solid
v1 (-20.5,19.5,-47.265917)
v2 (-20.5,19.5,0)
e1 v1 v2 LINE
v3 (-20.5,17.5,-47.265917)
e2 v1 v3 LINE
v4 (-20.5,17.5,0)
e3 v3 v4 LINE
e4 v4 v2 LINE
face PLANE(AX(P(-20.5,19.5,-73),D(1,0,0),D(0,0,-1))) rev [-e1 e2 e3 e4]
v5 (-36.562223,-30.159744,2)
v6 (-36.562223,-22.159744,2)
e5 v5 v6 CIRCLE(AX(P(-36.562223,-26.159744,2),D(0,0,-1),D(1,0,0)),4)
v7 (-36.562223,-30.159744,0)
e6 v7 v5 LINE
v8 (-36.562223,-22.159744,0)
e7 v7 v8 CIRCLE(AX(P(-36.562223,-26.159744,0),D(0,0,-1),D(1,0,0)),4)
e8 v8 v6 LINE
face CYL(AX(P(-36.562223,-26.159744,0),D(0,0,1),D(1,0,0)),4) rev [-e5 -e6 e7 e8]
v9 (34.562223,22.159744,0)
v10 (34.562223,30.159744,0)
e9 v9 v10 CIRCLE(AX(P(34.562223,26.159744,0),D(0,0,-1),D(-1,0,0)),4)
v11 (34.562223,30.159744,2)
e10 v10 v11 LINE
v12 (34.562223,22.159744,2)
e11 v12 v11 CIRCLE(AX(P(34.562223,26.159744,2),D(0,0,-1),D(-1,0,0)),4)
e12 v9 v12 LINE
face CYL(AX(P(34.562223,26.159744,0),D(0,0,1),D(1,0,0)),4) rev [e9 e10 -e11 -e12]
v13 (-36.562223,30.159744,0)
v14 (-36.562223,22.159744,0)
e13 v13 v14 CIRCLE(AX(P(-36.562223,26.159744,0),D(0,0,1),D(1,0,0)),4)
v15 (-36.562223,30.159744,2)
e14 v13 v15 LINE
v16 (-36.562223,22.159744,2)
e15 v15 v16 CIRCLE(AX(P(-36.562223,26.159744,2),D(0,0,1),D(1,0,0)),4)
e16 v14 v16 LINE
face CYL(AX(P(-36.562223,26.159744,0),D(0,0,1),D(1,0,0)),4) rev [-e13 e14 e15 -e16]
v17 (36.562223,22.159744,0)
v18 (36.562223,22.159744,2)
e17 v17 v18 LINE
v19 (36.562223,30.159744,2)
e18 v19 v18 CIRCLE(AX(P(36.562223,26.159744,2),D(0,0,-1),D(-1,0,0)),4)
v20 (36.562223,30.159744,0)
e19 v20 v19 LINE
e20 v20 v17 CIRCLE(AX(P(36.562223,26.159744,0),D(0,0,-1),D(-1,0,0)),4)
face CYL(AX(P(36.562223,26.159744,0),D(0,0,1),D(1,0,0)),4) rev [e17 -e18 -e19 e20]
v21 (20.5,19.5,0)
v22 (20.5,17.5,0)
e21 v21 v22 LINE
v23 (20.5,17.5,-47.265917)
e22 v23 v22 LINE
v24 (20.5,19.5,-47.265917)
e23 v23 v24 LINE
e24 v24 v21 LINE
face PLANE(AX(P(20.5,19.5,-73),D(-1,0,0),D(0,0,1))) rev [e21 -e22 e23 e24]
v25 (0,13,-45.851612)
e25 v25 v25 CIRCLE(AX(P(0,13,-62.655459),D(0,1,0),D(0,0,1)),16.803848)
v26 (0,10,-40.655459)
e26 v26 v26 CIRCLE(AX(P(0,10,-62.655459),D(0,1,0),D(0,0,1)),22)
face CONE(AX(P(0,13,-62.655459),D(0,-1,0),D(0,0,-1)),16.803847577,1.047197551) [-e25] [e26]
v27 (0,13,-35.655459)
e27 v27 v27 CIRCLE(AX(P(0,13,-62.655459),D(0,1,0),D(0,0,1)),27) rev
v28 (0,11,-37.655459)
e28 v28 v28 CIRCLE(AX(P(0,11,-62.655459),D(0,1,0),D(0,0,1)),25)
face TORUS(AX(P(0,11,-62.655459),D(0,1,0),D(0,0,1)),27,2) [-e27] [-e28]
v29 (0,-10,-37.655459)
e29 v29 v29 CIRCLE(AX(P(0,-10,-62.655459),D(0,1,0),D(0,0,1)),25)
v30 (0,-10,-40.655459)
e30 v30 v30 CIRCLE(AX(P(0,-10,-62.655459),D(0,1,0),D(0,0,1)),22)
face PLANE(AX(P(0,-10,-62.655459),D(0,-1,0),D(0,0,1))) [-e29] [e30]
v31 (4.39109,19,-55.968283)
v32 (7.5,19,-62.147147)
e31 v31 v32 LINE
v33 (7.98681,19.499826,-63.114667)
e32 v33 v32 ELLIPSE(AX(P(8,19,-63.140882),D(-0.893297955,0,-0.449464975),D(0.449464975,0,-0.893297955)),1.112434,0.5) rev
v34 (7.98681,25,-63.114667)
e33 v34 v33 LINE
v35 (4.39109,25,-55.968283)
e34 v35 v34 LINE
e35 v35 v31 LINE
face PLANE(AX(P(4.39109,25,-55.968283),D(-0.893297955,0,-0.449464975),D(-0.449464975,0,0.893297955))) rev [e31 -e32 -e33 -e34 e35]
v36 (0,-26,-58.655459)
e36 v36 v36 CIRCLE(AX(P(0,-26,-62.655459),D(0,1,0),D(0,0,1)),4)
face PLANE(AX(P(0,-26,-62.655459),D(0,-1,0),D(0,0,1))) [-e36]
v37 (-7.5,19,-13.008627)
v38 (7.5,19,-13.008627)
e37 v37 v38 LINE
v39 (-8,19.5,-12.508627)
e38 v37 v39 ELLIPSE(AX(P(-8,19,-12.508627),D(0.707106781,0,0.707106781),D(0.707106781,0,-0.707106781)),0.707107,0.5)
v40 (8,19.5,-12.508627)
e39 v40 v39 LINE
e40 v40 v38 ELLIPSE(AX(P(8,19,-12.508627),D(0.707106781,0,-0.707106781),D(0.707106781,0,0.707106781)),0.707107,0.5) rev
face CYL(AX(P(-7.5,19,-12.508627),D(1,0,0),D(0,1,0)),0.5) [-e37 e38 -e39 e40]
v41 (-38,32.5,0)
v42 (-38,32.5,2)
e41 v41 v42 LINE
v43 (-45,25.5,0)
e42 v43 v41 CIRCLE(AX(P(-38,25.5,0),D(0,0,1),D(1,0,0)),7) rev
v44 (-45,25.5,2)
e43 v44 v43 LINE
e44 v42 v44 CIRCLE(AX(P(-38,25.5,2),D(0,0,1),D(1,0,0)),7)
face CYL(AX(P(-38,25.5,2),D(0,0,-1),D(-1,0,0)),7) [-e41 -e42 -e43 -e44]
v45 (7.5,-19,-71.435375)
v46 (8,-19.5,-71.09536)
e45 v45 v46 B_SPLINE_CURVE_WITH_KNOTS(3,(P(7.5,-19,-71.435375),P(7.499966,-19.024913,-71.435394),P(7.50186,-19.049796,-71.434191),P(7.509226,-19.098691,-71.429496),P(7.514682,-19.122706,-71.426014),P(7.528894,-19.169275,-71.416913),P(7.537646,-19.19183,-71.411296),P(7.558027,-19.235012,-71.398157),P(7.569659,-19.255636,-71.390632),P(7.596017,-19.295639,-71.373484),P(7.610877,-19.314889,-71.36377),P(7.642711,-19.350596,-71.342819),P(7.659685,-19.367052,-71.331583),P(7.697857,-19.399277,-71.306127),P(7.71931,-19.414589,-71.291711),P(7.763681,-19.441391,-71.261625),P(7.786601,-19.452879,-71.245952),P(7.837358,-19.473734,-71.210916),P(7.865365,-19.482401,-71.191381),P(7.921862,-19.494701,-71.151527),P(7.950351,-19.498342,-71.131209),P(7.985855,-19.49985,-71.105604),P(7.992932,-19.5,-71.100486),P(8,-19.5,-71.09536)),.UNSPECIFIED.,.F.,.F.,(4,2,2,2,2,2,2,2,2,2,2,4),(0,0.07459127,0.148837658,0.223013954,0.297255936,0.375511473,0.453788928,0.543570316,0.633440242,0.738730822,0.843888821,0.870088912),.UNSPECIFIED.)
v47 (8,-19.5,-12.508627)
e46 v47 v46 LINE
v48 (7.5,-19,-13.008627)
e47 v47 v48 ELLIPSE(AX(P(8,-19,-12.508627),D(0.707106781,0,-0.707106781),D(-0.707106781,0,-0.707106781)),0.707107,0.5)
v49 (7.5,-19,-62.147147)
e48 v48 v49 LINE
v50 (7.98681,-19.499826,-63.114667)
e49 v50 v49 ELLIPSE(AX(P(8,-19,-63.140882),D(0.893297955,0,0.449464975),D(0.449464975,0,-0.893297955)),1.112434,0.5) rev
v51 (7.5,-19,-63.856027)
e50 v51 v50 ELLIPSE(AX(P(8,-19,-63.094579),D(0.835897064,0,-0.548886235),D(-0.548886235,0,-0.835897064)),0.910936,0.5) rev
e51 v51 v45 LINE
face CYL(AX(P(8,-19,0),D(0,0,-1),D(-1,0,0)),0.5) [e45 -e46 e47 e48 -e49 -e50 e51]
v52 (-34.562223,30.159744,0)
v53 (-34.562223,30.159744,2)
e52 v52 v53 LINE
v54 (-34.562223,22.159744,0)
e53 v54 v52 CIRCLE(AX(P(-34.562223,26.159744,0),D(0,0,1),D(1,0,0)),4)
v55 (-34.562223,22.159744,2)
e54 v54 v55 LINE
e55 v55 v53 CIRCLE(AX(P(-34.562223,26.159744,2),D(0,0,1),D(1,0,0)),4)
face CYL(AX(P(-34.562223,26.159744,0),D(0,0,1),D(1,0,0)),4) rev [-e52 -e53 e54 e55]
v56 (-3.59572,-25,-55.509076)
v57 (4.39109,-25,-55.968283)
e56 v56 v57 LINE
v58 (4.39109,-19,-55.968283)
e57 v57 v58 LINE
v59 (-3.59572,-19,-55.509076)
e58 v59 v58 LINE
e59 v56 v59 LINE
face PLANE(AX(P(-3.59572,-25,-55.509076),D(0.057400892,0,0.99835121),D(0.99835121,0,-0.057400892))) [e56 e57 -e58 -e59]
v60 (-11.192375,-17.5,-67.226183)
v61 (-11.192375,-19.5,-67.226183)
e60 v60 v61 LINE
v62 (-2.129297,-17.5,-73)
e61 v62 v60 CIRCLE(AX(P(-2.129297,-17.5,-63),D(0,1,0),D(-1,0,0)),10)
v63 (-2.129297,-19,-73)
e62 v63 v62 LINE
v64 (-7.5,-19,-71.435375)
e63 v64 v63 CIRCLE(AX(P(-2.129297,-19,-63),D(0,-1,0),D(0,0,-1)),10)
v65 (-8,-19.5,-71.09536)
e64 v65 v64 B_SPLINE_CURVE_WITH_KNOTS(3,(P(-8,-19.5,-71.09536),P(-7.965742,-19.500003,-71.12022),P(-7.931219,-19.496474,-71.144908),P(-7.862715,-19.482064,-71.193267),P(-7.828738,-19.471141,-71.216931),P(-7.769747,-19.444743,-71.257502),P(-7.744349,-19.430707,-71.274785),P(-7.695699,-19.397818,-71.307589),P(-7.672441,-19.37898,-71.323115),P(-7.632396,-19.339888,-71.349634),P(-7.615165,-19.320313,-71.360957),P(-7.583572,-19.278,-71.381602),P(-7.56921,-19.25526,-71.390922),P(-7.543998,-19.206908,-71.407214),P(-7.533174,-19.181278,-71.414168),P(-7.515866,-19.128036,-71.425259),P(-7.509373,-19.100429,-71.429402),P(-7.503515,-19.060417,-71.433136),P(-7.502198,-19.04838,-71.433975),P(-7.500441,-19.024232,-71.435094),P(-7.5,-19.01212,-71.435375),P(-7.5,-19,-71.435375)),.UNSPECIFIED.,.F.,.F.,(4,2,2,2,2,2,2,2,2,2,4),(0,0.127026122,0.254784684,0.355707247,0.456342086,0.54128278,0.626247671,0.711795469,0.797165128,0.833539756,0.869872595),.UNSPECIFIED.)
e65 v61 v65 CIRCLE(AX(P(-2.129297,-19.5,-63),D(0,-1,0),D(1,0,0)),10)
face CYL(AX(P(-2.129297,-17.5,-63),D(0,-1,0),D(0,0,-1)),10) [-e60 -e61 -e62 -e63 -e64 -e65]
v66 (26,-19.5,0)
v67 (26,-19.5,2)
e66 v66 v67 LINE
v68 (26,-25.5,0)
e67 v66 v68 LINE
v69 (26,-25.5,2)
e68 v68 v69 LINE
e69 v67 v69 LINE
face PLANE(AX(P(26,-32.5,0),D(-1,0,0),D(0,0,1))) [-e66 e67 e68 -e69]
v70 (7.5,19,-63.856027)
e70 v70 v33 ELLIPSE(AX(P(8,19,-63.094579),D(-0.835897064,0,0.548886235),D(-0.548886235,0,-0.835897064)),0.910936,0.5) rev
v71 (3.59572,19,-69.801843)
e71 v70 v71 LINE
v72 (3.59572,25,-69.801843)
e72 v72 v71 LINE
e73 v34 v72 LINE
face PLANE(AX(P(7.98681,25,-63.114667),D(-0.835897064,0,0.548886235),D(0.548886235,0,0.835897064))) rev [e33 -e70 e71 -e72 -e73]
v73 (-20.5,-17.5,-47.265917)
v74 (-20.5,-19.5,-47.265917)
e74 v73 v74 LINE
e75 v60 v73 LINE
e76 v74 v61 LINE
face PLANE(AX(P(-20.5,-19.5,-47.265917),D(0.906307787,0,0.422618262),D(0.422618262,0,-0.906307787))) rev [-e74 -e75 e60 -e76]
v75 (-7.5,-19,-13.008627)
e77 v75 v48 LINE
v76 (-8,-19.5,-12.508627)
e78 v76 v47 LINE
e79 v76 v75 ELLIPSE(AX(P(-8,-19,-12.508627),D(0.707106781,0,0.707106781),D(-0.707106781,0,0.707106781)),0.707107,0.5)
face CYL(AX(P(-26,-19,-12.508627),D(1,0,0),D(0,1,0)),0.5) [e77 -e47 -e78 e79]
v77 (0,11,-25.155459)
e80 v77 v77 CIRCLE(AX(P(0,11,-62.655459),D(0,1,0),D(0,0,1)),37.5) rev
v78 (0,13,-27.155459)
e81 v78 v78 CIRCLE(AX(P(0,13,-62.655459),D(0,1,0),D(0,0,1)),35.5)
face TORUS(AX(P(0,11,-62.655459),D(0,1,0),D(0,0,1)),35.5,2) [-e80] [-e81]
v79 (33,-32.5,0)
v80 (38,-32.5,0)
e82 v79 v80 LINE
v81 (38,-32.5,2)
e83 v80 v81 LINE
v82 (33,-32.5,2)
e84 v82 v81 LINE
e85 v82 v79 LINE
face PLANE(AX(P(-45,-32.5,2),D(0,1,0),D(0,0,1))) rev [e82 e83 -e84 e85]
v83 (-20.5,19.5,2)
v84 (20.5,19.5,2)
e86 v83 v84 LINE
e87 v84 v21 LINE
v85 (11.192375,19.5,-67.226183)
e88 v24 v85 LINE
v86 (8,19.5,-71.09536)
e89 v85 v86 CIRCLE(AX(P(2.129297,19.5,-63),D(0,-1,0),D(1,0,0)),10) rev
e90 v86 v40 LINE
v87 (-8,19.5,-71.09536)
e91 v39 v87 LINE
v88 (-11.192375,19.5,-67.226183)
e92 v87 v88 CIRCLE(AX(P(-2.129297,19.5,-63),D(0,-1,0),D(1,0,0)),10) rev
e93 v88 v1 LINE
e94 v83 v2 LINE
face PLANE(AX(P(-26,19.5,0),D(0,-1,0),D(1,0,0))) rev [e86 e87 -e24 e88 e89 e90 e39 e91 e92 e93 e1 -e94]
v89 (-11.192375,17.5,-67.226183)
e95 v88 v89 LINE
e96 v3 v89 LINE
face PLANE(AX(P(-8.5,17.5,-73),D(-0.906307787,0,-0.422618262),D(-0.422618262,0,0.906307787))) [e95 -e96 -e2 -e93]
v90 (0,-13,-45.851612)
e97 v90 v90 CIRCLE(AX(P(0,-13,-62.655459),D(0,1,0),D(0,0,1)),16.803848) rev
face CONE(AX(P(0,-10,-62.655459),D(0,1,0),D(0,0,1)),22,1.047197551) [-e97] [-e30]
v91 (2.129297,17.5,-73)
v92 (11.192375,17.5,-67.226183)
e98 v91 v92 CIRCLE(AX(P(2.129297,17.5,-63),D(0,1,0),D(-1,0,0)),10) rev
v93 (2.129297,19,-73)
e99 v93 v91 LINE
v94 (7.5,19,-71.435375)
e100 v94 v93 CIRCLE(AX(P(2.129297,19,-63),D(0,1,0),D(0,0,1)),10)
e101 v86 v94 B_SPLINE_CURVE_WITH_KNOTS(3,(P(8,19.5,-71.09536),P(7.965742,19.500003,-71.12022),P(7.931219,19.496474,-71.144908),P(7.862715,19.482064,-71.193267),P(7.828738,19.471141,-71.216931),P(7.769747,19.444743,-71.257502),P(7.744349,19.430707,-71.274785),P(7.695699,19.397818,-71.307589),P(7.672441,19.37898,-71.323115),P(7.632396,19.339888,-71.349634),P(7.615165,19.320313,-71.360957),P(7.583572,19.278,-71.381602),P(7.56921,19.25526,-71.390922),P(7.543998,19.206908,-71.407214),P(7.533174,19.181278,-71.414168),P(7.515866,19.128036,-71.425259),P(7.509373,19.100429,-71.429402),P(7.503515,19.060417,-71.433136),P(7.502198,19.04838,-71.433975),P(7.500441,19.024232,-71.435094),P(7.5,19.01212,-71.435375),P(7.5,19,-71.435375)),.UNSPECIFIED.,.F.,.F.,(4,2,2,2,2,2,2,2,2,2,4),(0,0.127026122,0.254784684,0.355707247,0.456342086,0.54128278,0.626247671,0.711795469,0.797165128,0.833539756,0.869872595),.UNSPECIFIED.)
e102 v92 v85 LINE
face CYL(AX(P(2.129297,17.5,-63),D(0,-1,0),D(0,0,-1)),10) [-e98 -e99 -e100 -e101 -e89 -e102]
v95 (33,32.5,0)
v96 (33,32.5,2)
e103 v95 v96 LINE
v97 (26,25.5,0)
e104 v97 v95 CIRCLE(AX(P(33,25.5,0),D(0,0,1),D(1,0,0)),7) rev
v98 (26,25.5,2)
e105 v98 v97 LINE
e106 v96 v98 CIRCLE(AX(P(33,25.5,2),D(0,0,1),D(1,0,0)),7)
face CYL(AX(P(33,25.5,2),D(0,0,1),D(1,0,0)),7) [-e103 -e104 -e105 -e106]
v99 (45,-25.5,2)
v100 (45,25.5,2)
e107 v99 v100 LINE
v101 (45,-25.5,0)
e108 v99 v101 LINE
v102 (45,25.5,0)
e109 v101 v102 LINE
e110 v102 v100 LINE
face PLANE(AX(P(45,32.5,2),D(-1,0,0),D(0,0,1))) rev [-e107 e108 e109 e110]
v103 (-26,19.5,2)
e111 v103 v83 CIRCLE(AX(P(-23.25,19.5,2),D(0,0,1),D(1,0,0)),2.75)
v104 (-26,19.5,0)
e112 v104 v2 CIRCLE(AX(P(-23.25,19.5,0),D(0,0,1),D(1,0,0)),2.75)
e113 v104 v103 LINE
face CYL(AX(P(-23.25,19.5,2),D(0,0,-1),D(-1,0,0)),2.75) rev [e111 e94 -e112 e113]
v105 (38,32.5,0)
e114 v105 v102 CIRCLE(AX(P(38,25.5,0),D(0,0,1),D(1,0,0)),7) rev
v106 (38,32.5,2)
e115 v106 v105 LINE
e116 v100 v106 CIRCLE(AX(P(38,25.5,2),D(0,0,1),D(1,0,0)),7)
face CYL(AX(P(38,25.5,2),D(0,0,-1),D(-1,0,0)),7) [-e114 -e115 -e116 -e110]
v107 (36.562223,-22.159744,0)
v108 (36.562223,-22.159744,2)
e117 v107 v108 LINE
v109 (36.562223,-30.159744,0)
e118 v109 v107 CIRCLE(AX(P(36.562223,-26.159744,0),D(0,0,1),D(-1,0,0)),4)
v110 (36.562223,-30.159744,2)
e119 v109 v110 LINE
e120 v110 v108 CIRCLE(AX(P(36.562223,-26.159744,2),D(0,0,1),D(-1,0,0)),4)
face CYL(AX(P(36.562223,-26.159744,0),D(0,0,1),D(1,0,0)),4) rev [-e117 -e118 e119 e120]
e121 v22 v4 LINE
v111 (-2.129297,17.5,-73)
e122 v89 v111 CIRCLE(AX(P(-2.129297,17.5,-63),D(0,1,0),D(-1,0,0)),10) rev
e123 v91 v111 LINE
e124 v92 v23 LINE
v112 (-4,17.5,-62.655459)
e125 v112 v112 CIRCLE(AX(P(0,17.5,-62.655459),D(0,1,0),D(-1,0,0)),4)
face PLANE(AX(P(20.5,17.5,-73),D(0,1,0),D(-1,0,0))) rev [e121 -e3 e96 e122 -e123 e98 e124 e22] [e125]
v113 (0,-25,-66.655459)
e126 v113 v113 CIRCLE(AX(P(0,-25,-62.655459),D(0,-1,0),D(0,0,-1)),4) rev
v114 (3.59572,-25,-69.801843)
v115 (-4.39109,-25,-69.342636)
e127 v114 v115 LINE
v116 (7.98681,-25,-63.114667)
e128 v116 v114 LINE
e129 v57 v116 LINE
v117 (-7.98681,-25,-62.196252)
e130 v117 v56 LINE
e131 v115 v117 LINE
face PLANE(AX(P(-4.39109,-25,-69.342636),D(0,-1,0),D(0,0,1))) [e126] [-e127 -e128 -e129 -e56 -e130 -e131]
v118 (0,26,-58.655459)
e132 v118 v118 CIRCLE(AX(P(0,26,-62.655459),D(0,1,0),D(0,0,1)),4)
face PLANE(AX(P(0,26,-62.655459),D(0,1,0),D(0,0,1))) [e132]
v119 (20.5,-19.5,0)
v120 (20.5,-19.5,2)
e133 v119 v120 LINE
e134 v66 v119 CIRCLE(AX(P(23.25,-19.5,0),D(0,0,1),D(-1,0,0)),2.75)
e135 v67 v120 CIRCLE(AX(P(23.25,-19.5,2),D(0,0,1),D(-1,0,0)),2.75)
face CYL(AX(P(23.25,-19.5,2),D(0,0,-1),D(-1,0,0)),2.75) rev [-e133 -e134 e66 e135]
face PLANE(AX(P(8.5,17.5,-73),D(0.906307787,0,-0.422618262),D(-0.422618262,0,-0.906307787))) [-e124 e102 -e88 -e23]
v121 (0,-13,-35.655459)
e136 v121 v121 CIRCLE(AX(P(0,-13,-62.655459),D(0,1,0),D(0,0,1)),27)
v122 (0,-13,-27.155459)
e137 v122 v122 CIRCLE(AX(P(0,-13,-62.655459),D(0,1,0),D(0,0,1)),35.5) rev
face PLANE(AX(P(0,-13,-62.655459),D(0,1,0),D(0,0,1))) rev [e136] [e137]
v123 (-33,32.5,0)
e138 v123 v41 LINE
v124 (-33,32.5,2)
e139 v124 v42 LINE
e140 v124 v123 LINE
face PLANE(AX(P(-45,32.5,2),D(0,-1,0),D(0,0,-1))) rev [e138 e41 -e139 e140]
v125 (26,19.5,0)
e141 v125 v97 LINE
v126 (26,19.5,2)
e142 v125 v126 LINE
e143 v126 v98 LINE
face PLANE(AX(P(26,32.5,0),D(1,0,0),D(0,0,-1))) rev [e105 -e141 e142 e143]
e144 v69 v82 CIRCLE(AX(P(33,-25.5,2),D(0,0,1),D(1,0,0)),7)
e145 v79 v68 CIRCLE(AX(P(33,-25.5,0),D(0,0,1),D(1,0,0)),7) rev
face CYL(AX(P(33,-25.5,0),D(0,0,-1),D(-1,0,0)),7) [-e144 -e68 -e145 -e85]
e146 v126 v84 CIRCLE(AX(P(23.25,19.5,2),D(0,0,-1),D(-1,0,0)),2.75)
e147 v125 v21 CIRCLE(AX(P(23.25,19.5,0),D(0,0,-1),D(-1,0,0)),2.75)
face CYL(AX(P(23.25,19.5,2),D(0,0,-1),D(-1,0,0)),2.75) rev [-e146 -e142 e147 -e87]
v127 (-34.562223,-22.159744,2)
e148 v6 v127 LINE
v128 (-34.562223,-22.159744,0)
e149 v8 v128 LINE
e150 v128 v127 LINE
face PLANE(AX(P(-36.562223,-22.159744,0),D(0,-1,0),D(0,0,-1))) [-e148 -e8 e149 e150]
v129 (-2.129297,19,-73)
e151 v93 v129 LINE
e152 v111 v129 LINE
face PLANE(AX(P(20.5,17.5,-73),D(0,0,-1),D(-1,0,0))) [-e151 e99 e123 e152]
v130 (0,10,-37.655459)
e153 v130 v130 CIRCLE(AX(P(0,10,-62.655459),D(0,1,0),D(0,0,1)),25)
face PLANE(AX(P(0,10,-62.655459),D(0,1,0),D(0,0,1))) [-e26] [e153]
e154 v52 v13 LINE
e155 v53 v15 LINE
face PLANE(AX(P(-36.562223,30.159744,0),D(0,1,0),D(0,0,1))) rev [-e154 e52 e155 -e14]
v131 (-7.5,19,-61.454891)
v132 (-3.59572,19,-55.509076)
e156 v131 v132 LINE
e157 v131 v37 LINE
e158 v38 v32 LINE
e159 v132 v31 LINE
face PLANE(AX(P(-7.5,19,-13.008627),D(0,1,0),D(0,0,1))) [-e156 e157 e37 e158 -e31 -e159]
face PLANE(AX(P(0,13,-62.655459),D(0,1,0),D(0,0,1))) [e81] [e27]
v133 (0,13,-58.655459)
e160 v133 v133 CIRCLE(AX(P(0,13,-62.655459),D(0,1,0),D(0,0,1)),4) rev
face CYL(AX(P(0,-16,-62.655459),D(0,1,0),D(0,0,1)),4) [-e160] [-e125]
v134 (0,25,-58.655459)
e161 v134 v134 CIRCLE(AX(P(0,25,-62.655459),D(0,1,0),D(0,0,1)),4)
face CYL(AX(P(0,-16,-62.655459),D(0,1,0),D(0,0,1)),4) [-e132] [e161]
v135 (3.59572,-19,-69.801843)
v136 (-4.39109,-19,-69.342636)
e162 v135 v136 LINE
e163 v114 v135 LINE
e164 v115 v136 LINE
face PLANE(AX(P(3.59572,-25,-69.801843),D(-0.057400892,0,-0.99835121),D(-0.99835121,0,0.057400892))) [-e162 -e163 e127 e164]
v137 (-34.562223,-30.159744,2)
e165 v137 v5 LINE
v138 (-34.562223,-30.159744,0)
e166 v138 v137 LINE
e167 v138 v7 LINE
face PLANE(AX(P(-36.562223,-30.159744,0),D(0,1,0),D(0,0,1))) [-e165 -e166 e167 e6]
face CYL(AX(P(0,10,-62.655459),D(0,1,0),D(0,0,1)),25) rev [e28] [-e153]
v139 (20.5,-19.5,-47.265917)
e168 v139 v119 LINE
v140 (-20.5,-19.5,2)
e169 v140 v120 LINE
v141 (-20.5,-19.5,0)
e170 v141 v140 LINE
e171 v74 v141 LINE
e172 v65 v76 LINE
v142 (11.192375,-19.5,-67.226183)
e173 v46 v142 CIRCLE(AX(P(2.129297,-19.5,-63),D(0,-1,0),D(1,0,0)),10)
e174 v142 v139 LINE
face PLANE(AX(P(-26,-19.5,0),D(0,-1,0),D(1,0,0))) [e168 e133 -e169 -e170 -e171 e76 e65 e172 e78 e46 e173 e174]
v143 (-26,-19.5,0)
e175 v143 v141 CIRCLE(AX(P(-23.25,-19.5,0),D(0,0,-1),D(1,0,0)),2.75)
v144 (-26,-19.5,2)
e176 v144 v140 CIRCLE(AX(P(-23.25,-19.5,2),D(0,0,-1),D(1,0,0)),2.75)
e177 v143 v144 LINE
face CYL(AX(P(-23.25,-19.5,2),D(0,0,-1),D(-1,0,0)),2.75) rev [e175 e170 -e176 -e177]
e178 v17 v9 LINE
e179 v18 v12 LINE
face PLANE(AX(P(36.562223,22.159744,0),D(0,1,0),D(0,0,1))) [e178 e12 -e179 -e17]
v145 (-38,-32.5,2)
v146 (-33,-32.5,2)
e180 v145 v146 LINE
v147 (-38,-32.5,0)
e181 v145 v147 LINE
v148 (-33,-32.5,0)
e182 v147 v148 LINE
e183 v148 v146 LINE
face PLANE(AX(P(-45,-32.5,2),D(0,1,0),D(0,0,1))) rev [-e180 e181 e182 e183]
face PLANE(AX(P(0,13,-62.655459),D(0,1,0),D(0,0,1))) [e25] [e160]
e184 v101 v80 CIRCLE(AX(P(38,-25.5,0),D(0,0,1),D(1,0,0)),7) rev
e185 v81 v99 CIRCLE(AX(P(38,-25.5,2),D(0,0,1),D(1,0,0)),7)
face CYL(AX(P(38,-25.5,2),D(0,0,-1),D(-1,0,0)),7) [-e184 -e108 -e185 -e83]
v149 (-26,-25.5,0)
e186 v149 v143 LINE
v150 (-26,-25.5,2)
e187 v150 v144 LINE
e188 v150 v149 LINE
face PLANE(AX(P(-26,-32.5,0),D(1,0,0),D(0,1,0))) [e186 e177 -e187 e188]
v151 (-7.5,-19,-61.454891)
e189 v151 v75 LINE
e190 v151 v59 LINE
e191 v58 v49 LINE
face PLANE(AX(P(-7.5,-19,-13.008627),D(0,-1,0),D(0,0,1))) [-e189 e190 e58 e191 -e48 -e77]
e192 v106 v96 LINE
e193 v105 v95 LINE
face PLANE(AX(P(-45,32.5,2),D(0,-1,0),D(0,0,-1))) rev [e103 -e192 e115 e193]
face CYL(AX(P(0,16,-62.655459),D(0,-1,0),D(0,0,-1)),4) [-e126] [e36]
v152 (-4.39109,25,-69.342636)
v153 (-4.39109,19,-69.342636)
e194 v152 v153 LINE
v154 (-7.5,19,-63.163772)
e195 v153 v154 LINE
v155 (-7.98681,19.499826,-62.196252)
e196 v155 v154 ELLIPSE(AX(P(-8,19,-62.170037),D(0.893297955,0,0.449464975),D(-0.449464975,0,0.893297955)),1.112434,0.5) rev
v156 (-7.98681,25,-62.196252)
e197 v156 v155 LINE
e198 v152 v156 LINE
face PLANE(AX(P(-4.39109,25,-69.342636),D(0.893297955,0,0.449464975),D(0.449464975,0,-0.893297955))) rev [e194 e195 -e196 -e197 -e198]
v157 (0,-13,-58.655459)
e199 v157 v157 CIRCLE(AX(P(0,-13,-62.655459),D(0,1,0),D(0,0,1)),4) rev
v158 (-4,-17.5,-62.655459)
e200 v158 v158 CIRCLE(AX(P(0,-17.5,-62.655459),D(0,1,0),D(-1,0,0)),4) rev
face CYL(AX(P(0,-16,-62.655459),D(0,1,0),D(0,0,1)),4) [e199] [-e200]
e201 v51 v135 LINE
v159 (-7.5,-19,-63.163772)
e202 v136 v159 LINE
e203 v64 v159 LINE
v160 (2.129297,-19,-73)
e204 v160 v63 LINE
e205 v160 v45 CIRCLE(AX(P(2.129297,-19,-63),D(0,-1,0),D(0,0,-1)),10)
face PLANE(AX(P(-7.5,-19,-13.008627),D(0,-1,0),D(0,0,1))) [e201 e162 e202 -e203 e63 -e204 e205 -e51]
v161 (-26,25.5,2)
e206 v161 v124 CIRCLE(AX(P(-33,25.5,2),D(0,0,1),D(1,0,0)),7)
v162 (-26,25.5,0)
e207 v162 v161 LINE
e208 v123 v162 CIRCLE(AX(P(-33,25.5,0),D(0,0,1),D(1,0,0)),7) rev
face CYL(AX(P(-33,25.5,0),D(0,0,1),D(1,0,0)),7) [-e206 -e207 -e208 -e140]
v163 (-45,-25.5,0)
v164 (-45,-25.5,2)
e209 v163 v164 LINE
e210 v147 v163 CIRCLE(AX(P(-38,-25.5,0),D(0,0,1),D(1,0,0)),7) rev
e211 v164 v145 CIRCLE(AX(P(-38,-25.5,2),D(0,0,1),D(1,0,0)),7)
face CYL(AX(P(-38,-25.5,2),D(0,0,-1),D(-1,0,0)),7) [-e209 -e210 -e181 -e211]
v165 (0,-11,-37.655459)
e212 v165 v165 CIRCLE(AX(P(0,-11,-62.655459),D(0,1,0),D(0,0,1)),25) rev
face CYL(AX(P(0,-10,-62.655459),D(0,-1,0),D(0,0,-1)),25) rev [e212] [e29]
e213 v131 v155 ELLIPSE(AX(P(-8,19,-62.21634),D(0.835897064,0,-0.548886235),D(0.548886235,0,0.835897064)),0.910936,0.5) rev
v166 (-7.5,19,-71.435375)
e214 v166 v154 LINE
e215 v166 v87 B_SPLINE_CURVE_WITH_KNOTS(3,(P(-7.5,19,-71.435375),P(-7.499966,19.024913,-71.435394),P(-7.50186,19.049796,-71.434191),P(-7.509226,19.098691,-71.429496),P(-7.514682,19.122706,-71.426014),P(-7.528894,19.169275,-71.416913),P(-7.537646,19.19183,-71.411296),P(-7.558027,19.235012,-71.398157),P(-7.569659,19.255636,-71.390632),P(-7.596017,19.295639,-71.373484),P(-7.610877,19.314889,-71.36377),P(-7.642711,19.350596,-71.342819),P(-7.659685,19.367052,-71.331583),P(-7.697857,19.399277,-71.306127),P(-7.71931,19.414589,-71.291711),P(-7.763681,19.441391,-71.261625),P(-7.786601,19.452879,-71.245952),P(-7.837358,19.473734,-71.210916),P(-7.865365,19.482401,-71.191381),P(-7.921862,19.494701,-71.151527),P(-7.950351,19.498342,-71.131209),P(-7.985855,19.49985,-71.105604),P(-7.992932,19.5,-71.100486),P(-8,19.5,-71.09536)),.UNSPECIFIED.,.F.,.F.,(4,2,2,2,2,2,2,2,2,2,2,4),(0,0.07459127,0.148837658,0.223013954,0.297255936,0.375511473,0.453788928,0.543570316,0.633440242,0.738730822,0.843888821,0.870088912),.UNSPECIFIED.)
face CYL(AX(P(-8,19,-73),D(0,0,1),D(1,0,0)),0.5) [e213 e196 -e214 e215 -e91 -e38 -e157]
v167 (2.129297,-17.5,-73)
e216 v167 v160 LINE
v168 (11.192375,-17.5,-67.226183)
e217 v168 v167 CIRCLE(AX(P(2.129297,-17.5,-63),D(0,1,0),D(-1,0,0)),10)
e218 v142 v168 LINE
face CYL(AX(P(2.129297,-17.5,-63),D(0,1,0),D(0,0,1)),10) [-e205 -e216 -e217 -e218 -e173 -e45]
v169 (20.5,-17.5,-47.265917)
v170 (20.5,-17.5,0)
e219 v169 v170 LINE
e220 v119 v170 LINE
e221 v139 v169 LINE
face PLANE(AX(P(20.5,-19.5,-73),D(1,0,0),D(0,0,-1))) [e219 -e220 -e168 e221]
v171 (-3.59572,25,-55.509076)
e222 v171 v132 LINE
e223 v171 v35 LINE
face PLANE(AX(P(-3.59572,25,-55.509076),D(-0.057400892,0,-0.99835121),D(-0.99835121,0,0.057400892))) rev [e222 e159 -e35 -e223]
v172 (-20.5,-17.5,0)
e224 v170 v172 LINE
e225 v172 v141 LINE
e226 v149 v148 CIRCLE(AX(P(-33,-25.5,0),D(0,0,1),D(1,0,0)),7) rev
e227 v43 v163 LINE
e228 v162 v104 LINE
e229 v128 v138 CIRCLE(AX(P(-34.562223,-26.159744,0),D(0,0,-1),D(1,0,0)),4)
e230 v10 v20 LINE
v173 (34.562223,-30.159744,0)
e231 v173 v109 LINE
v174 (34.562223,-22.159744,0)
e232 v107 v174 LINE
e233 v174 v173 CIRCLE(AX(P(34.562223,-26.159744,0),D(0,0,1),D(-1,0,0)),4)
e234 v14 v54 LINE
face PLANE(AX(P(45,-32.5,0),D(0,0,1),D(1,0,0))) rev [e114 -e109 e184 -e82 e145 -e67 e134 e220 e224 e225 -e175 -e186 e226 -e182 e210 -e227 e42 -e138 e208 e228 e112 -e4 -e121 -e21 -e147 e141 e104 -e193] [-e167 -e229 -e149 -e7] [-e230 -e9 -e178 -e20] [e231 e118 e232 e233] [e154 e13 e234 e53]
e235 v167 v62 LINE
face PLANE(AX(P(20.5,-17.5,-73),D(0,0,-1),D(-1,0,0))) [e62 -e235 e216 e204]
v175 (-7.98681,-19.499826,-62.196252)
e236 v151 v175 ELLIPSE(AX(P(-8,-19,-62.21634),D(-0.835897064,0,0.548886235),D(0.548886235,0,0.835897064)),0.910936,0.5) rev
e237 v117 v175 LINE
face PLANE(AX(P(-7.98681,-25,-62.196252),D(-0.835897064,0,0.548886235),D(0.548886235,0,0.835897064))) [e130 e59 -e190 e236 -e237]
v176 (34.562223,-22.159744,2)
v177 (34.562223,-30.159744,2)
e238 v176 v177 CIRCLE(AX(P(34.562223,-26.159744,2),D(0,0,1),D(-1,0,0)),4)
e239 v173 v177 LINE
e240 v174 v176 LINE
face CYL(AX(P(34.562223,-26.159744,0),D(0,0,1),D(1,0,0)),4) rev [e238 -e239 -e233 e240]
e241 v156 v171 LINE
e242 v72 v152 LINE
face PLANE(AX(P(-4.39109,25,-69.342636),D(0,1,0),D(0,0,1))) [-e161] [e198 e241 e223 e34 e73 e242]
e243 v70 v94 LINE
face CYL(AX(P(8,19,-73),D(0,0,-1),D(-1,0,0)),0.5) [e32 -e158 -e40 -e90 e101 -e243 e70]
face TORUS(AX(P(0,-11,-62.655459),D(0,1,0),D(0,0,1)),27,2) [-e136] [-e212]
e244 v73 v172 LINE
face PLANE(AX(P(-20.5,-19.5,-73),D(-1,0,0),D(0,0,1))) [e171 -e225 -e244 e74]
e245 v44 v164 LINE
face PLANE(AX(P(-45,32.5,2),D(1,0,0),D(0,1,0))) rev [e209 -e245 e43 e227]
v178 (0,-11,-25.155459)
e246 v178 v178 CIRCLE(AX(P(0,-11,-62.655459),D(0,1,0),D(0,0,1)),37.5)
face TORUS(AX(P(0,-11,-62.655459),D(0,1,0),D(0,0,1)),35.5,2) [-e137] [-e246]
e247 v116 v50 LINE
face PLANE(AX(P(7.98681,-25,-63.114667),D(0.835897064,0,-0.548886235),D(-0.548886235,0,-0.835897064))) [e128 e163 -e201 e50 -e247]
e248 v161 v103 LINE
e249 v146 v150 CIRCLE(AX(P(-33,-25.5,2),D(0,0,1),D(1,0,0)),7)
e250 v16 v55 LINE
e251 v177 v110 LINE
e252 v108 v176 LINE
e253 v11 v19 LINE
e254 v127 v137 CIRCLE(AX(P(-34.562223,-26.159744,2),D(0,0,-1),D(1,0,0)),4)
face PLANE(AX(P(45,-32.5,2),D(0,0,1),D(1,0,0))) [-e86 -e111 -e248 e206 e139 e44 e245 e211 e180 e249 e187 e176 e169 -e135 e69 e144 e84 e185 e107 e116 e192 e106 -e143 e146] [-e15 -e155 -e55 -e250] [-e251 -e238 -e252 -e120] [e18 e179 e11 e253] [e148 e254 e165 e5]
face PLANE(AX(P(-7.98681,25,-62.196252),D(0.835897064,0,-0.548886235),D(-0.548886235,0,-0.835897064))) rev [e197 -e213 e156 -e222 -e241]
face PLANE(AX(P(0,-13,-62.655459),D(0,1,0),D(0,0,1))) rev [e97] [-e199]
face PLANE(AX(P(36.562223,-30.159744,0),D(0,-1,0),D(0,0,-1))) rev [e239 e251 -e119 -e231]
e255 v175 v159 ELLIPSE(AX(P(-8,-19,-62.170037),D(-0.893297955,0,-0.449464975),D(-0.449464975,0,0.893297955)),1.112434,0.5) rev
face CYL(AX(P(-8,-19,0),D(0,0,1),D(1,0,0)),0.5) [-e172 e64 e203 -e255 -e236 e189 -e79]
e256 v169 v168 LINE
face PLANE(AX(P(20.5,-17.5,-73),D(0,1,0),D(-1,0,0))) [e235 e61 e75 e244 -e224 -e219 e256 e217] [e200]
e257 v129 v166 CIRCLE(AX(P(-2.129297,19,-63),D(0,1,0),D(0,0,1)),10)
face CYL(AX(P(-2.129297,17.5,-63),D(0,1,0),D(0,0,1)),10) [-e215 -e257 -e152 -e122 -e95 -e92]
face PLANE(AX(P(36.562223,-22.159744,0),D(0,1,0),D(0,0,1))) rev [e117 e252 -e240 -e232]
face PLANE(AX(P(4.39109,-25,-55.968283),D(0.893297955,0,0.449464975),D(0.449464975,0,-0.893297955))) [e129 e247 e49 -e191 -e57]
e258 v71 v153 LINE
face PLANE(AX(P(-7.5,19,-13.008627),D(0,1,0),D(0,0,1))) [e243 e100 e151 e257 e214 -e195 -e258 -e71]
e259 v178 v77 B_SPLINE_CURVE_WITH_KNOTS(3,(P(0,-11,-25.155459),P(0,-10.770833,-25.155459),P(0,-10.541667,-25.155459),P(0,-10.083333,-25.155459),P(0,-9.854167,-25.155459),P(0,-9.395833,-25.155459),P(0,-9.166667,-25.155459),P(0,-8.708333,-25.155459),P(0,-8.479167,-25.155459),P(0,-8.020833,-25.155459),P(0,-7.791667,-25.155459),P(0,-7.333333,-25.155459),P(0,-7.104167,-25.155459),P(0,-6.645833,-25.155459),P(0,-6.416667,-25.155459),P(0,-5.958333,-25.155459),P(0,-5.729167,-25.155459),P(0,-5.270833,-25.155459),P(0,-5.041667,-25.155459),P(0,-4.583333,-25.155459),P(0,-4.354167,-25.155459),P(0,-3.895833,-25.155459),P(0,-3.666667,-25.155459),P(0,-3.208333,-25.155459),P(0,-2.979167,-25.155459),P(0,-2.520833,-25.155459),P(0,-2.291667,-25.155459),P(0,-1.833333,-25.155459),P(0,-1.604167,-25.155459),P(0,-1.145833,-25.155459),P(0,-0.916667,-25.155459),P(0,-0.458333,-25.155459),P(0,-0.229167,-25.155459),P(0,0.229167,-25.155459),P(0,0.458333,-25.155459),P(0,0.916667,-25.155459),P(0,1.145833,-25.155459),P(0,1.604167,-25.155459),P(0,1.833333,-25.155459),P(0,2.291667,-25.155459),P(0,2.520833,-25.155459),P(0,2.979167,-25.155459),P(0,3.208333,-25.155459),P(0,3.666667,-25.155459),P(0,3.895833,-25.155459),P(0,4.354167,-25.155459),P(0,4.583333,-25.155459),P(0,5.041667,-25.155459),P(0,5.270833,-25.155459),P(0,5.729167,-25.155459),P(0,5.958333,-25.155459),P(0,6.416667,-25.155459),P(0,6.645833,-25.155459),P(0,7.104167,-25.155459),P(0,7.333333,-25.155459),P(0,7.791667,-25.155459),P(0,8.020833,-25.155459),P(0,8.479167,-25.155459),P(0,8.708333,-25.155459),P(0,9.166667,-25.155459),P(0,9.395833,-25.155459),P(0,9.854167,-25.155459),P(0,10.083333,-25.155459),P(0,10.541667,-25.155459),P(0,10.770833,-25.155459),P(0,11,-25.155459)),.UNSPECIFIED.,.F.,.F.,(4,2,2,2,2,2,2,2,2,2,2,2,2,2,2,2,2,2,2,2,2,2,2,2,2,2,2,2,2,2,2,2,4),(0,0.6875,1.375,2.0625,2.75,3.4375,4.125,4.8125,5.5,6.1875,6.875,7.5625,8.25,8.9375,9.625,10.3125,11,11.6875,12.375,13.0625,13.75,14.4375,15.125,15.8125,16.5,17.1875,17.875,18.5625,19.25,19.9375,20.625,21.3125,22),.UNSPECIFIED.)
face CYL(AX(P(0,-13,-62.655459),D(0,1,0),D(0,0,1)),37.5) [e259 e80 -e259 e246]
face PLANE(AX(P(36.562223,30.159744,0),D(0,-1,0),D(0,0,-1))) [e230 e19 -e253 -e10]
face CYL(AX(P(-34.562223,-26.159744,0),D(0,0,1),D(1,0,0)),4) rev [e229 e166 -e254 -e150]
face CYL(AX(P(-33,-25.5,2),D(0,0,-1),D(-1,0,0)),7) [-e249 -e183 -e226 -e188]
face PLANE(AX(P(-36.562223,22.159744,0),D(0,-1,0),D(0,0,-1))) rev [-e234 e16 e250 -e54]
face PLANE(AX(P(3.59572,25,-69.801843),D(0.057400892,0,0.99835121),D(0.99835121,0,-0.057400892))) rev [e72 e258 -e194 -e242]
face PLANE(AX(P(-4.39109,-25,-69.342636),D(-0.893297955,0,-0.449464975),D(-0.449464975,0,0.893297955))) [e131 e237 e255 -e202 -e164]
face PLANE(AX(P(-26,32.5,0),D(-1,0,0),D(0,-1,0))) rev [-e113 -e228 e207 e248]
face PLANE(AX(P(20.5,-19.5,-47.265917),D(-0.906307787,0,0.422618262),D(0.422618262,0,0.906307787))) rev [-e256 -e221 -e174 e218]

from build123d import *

# Parameters (mm, degrees)
SKETCH_1_W               = 90
SKETCH_1_H               = 65
EXTRUDE_1_DEPTH          = 2
SKETCH_2_W               = 52
SKETCH_2_H               = 13
CUT_EXTRUDE_1_DEPTH      = 56.54502678
CUT_EXTRUDE_2_DEPTH      = 56.54502678
MIRROR_3_COPY_1_DEPTH    = 56.54502678
FILLET_1_R               = 7
SKETCH_4_W               = 41
SKETCH_4_H               = 2
EXTRUDE_2_DEPTH          = 73
SKETCH_5_W               = 15
SKETCH_5_H               = 59.991373208
CUT_EXTRUDE_3_DEPTH      = 0.5
FILLET_2_R               = 0.5
FILLET_3_R               = 0.5
CHAMFER_4_SIZE           = 12
CHAMFER_4_SIZE2          = 25.734083046
CHAMFER_5_SIZE           = 12
CHAMFER_5_SIZE2          = 25.734083046
CHAMFER_6_SIZE           = 12
CHAMFER_6_SIZE2          = 25.734083046
CHAMFER_7_SIZE           = 12
CHAMFER_7_SIZE2          = 25.734083046
FILLET_4_R               = 10
EXTRUDE_3_DEPTH          = 6
EXTRUDE_START            = -41
SKETCH_7_R               = 4
EXTRUDE_4_DEPTH          = 42
SKETCH_8_R               = 2.75
CUT_EXTRUDE_4_DEPTH      = 92.707415265
MIRROR_9_COPY_1_SKETCH_R = 2.75
MIRROR_9_COPY_1_DEPTH    = 92.707415265
EXTRUDE_7_DEPTH          = 13
EXTRUDE_7_DEPTH_BACK     = 13
SKETCH_10_R              = 37.5
FILLET_5_R               = 2
SKETCH_11_R              = 25
SKETCH_11_R_2            = 22
CUT_EXTRUDE_5_DEPTH      = 3
FILLET_6_R               = 2
FILLET_7_R               = 2
CHAMFER_8_SIZE2          = 5.196152423
CHAMFER_8_SIZE           = 3
CHAMFER_9_SIZE2          = 3
CHAMFER_9_SIZE           = 5.196152423


with BuildPart() as part:
    # 草图1 → 凸台-拉伸1 (new body)
    with BuildSketch(Plane.XY):
        Rectangle(SKETCH_1_W, SKETCH_1_H)
    extrude(amount=EXTRUDE_1_DEPTH)

    # 草图2 → 切除-拉伸1 (cut, through all)
    with BuildSketch(Plane.XY.offset(2)):
        with Locations((0, 26)):
            Rectangle(SKETCH_2_W, SKETCH_2_H)
    cut_extrude_1 = extrude(amount=-CUT_EXTRUDE_1_DEPTH, mode=Mode.SUBTRACT)

    # 镜向1: 切除-拉伸1 across plane
    add(cut_extrude_1.mirror(Plane.ZX), mode=Mode.SUBTRACT)

    # 草图3 → 切除-拉伸2 (cut, through all)
    with BuildSketch(Plane.XY.offset(2)):
        with BuildLine():
            Line((-36.562223186, 30.159744382), (-34.562223186, 30.159744382))
            ThreePointArc((-34.562223186, 30.159744382), (-30.562223186, 26.159744382), (-34.562223186, 22.159744382))
            Line((-34.562223186, 22.159744382), (-36.562223186, 22.159744382))
            ThreePointArc((-36.562223186, 22.159744382), (-40.562223186, 26.159744382), (-36.562223186, 30.159744382))
        make_face()
    cut_extrude_2 = extrude(amount=-CUT_EXTRUDE_2_DEPTH, mode=Mode.SUBTRACT)

    # 镜向2: 切除-拉伸2 across plane
    add(cut_extrude_2.mirror(Plane(origin=(0, 0, 0), x_dir=(0, 0, 1), z_dir=(1, 0, 0))), mode=Mode.SUBTRACT)

    # 镜向3: 切除-拉伸2 across plane
    add(cut_extrude_2.mirror(Plane.ZX), mode=Mode.SUBTRACT)

    # 镜向3 copy 1 sketch → 镜向3 copy 1 (cut, through all)
    with BuildSketch(Plane(origin=(0, 0, 2), x_dir=(-1, 0, 0), z_dir=(0, 0, 1))):
        with BuildLine():
            Line((-36.562223186, 30.159744382), (-34.562223186, 30.159744382))
            ThreePointArc((-34.562223186, 30.159744382), (-30.562223186, 26.159744382), (-34.562223186, 22.159744382))
            Line((-34.562223186, 22.159744382), (-36.562223186, 22.159744382))
            ThreePointArc((-36.562223186, 22.159744382), (-40.562223186, 26.159744382), (-36.562223186, 30.159744382))
        make_face()
    extrude(amount=-MIRROR_3_COPY_1_DEPTH, mode=Mode.SUBTRACT)

    # 圆角1
    fillet_1_edges = [part.edges().sort_by_distance(p)[0] for p in [
        (-26, 32.5, 1),
        (26, 32.5, 1),
        (-26, -32.5, 1),
        (26, -32.5, 1),
        (45, -32.5, 1),
        (-45, -32.5, 1),
        (-45, 32.5, 1),
        (45, 32.5, 1),
    ]]
    fillet(fillet_1_edges, radius=FILLET_1_R)

    # 草图4 → 凸台-拉伸2 (add)
    with BuildSketch(Plane(origin=(0, 0, 0), x_dir=(-1, 0, 0), z_dir=(0, 0, -1))):
        with Locations((0, 18.5)):
            Rectangle(SKETCH_4_W, SKETCH_4_H)
    extrude_2 = extrude(amount=EXTRUDE_2_DEPTH)

    # 镜向4: 凸台-拉伸2 across plane
    add(extrude_2.mirror(Plane.ZX))

    # 草图5 → 切除-拉伸3 (cut)
    with BuildSketch(Plane(origin=(0, 19.5, 0), x_dir=(1, 0, 0), z_dir=(0, 1, 0))):
        with Locations((0, 43.004313396)):
            Rectangle(SKETCH_5_W, SKETCH_5_H)
    cut_extrude_3 = extrude(amount=-CUT_EXTRUDE_3_DEPTH, mode=Mode.SUBTRACT)

    # 圆角2
    fillet_2_edges = [part.edges().sort_by_distance(p)[0] for p in [
        (0, 19.5, -13.008626792),
        (7.5, 19.5, -43.004313396),
        (-7.5, 19.5, -43.004313396),
    ]]
    fillet(fillet_2_edges, radius=FILLET_2_R - 0.0001)  # a hair under: the kernel refuses the full size

    # 镜向6: 切除-拉伸3 across plane
    add(cut_extrude_3.mirror(Plane.ZX), mode=Mode.SUBTRACT)

    # 圆角3
    fillet_3_edges = [part.edges().sort_by_distance(p)[0] for p in [
        (7.5, -19.5, -43.004313396),
        (-7.5, -19.5, -43.004313396),
        (0, -19.5, -13.008626792),
    ]]
    fillet(fillet_3_edges, radius=FILLET_3_R - 0.0001)  # a hair under: the kernel refuses the full size

    # 倒角4
    chamfer_4_edges = [part.edges().sort_by_distance(p)[0] for p in [
        (-20.5, -18.5, -73),
    ]]
    chamfer_4_side = [part.faces().sort_by_distance(p)[0] for p in [
        (0, -18.423106996, -73),
    ]]
    chamfer(chamfer_4_edges, length=CHAMFER_4_SIZE, length2=CHAMFER_4_SIZE2, reference=chamfer_4_side[0])

    # 倒角5
    chamfer_5_edges = [part.edges().sort_by_distance(p)[0] for p in [
        (20.5, -18.5, -73),
    ]]
    chamfer_5_side = [part.faces().sort_by_distance(p)[0] for p in [
        (6.905756389, -18.386486006, -73),
    ]]
    chamfer(chamfer_5_edges, length=CHAMFER_5_SIZE, length2=CHAMFER_5_SIZE2, reference=chamfer_5_side[0])

    # 倒角6
    chamfer_6_edges = [part.edges().sort_by_distance(p)[0] for p in [
        (20.5, 18.5, -73),
    ]]
    chamfer_6_side = [part.faces().sort_by_distance(p)[0] for p in [
        (0, 18.423106996, -73),
    ]]
    chamfer(chamfer_6_edges, length=CHAMFER_6_SIZE, length2=CHAMFER_6_SIZE2, reference=chamfer_6_side[0])

    # 倒角7
    chamfer_7_edges = [part.edges().sort_by_distance(p)[0] for p in [
        (-20.5, 18.5, -73),
    ]]
    chamfer_7_side = [part.faces().sort_by_distance(p)[0] for p in [
        (-6.905756389, 18.386486006, -73),
    ]]
    chamfer(chamfer_7_edges, length=CHAMFER_7_SIZE, length2=CHAMFER_7_SIZE2, reference=chamfer_7_side[0])

    # 圆角4
    fillet_4_edges = [part.edges().sort_by_distance(p)[0] for p in [
        (-8.5, 18.5, -73),
        (8.5, 18.5, -73),
        (8.5, -18.5, -73),
        (-8.5, -18.5, -73),
    ]]
    fillet(fillet_4_edges, radius=FILLET_4_R)

    # 草图6 → 凸台-拉伸3 (add)
    with BuildSketch(Plane(origin=(0, 19, 0), x_dir=(1, 0, 0), z_dir=(0, 1, 0))):
        Polygon((-4.39108988, 69.342635878), (-7.986809677, 62.196252237), (-3.595719796, 55.509075728), (4.39108988, 55.96828286), (7.986809677, 63.114666501), (3.595719796, 69.801843011), align=None)
    extrude_3 = extrude(amount=EXTRUDE_3_DEPTH)

    # 草图7 → 凸台-拉伸4 (add)
    with BuildSketch(Plane(origin=(0, 25, 0), x_dir=(1, 0, 0), z_dir=(0, 1, 0)).offset(EXTRUDE_START)):
        with Locations(Location((0, 62.655459369, 0), (0, 0, 270))):
            Circle(SKETCH_7_R)
    extrude_4 = extrude(amount=EXTRUDE_4_DEPTH)

    # 镜向7: 凸台-拉伸3, 凸台-拉伸4 across plane
    add(extrude_3.mirror(Plane.ZX))
    add(extrude_4.mirror(Plane.ZX))

    # 草图8 → 切除-拉伸4 (cut, through all)
    with BuildSketch(Plane(origin=(0, 0, 0), x_dir=(-1, 0, 0), z_dir=(0, 0, -1))):
        with Locations((-23.25, 19.5)):
            Circle(SKETCH_8_R)
    cut_extrude_4 = extrude(amount=-CUT_EXTRUDE_4_DEPTH, mode=Mode.SUBTRACT)

    # 镜向8: 切除-拉伸4 across plane
    add(cut_extrude_4.mirror(Plane.ZX), mode=Mode.SUBTRACT)

    # 镜向9: 切除-拉伸4 across plane
    add(cut_extrude_4.mirror(Plane(origin=(0, 0, 0), x_dir=(0, 0, 1), z_dir=(1, 0, 0))), mode=Mode.SUBTRACT)

    # 镜向9 copy 1 sketch → 镜向9 copy 1 (cut, through all)
    with BuildSketch(Plane(origin=(0, 0, 0), x_dir=(1, 0, 0), z_dir=(0, 0, -1))):
        with Locations((-23.25, 19.5)):
            Circle(MIRROR_9_COPY_1_SKETCH_R)
    extrude(amount=-MIRROR_9_COPY_1_DEPTH, mode=Mode.SUBTRACT)

    # 草图10 → 凸台-拉伸7 (add, two sides: drawn at the far end of the back side and taken through both)
    with BuildSketch(Plane(origin=(0, 0, 0), x_dir=(1, 0, 0), z_dir=(0, 1, 0)).offset(-EXTRUDE_7_DEPTH_BACK)):
        with Locations(Location((0, 62.655459369, 0), (0, 0, 270))):
            Circle(SKETCH_10_R)
    extrude(amount=EXTRUDE_7_DEPTH + EXTRUDE_7_DEPTH_BACK)

    # 圆角5
    fillet_5_edges = [part.edges().sort_by_distance(p)[0] for p in [
        (0, -13, -100.155459369),
        (0, 13, -100.155459369),
    ]]
    fillet(fillet_5_edges, radius=FILLET_5_R)

    # 草图11 → 切除-拉伸5 (cut)
    with BuildSketch(Plane(origin=(0, 13, 0), x_dir=(1, 0, 0), z_dir=(0, 1, 0))):
        with Locations(Location((0, 62.655459369, 0), (0, 0, 270))):
            Circle(SKETCH_11_R)
        with Locations(Location((0, 62.655459369, 0), (0, 0, 270))):
            Circle(SKETCH_11_R_2, mode=Mode.SUBTRACT)
    cut_extrude_5 = extrude(amount=-CUT_EXTRUDE_5_DEPTH, mode=Mode.SUBTRACT)

    # 圆角6
    fillet_6_edges = [part.edges().sort_by_distance(p)[0] for p in [
        (0, 13, -87.655459369),
    ]]
    fillet(fillet_6_edges, radius=FILLET_6_R)

    # 镜向10: 切除-拉伸5 across plane
    add(cut_extrude_5.mirror(Plane.ZX), mode=Mode.SUBTRACT)

    # 圆角7
    fillet_7_edges = [part.edges().sort_by_distance(p)[0] for p in [
        (0, -13, -87.655459369),
    ]]
    fillet(fillet_7_edges, radius=FILLET_7_R)

    # 倒角8
    chamfer_8_edges = [part.edges().sort_by_distance(p)[0] for p in [
        (0, 13, -84.655459369),
    ]]
    chamfer_8_side = [part.faces().sort_by_distance(p)[0] for p in [
        (0, 12.94, -84.655459369),
    ]]
    chamfer(chamfer_8_edges, length=CHAMFER_8_SIZE - 0.0001, length2=CHAMFER_8_SIZE2 - 0.0001, reference=chamfer_8_side[0])  # a hair under: the kernel refuses the full size

    # 倒角9
    chamfer_9_edges = [part.edges().sort_by_distance(p)[0] for p in [
        (0, -13, -84.655459369),
    ]]
    chamfer_9_side = [part.faces().sort_by_distance(p)[0] for p in [
        (0, -13, -84.595459369),
    ]]
    chamfer(chamfer_9_edges, length=CHAMFER_9_SIZE - 0.0001, length2=CHAMFER_9_SIZE2 - 0.0001, reference=chamfer_9_side[0])  # a hair under: the kernel refuses the full size


solid = part.part
